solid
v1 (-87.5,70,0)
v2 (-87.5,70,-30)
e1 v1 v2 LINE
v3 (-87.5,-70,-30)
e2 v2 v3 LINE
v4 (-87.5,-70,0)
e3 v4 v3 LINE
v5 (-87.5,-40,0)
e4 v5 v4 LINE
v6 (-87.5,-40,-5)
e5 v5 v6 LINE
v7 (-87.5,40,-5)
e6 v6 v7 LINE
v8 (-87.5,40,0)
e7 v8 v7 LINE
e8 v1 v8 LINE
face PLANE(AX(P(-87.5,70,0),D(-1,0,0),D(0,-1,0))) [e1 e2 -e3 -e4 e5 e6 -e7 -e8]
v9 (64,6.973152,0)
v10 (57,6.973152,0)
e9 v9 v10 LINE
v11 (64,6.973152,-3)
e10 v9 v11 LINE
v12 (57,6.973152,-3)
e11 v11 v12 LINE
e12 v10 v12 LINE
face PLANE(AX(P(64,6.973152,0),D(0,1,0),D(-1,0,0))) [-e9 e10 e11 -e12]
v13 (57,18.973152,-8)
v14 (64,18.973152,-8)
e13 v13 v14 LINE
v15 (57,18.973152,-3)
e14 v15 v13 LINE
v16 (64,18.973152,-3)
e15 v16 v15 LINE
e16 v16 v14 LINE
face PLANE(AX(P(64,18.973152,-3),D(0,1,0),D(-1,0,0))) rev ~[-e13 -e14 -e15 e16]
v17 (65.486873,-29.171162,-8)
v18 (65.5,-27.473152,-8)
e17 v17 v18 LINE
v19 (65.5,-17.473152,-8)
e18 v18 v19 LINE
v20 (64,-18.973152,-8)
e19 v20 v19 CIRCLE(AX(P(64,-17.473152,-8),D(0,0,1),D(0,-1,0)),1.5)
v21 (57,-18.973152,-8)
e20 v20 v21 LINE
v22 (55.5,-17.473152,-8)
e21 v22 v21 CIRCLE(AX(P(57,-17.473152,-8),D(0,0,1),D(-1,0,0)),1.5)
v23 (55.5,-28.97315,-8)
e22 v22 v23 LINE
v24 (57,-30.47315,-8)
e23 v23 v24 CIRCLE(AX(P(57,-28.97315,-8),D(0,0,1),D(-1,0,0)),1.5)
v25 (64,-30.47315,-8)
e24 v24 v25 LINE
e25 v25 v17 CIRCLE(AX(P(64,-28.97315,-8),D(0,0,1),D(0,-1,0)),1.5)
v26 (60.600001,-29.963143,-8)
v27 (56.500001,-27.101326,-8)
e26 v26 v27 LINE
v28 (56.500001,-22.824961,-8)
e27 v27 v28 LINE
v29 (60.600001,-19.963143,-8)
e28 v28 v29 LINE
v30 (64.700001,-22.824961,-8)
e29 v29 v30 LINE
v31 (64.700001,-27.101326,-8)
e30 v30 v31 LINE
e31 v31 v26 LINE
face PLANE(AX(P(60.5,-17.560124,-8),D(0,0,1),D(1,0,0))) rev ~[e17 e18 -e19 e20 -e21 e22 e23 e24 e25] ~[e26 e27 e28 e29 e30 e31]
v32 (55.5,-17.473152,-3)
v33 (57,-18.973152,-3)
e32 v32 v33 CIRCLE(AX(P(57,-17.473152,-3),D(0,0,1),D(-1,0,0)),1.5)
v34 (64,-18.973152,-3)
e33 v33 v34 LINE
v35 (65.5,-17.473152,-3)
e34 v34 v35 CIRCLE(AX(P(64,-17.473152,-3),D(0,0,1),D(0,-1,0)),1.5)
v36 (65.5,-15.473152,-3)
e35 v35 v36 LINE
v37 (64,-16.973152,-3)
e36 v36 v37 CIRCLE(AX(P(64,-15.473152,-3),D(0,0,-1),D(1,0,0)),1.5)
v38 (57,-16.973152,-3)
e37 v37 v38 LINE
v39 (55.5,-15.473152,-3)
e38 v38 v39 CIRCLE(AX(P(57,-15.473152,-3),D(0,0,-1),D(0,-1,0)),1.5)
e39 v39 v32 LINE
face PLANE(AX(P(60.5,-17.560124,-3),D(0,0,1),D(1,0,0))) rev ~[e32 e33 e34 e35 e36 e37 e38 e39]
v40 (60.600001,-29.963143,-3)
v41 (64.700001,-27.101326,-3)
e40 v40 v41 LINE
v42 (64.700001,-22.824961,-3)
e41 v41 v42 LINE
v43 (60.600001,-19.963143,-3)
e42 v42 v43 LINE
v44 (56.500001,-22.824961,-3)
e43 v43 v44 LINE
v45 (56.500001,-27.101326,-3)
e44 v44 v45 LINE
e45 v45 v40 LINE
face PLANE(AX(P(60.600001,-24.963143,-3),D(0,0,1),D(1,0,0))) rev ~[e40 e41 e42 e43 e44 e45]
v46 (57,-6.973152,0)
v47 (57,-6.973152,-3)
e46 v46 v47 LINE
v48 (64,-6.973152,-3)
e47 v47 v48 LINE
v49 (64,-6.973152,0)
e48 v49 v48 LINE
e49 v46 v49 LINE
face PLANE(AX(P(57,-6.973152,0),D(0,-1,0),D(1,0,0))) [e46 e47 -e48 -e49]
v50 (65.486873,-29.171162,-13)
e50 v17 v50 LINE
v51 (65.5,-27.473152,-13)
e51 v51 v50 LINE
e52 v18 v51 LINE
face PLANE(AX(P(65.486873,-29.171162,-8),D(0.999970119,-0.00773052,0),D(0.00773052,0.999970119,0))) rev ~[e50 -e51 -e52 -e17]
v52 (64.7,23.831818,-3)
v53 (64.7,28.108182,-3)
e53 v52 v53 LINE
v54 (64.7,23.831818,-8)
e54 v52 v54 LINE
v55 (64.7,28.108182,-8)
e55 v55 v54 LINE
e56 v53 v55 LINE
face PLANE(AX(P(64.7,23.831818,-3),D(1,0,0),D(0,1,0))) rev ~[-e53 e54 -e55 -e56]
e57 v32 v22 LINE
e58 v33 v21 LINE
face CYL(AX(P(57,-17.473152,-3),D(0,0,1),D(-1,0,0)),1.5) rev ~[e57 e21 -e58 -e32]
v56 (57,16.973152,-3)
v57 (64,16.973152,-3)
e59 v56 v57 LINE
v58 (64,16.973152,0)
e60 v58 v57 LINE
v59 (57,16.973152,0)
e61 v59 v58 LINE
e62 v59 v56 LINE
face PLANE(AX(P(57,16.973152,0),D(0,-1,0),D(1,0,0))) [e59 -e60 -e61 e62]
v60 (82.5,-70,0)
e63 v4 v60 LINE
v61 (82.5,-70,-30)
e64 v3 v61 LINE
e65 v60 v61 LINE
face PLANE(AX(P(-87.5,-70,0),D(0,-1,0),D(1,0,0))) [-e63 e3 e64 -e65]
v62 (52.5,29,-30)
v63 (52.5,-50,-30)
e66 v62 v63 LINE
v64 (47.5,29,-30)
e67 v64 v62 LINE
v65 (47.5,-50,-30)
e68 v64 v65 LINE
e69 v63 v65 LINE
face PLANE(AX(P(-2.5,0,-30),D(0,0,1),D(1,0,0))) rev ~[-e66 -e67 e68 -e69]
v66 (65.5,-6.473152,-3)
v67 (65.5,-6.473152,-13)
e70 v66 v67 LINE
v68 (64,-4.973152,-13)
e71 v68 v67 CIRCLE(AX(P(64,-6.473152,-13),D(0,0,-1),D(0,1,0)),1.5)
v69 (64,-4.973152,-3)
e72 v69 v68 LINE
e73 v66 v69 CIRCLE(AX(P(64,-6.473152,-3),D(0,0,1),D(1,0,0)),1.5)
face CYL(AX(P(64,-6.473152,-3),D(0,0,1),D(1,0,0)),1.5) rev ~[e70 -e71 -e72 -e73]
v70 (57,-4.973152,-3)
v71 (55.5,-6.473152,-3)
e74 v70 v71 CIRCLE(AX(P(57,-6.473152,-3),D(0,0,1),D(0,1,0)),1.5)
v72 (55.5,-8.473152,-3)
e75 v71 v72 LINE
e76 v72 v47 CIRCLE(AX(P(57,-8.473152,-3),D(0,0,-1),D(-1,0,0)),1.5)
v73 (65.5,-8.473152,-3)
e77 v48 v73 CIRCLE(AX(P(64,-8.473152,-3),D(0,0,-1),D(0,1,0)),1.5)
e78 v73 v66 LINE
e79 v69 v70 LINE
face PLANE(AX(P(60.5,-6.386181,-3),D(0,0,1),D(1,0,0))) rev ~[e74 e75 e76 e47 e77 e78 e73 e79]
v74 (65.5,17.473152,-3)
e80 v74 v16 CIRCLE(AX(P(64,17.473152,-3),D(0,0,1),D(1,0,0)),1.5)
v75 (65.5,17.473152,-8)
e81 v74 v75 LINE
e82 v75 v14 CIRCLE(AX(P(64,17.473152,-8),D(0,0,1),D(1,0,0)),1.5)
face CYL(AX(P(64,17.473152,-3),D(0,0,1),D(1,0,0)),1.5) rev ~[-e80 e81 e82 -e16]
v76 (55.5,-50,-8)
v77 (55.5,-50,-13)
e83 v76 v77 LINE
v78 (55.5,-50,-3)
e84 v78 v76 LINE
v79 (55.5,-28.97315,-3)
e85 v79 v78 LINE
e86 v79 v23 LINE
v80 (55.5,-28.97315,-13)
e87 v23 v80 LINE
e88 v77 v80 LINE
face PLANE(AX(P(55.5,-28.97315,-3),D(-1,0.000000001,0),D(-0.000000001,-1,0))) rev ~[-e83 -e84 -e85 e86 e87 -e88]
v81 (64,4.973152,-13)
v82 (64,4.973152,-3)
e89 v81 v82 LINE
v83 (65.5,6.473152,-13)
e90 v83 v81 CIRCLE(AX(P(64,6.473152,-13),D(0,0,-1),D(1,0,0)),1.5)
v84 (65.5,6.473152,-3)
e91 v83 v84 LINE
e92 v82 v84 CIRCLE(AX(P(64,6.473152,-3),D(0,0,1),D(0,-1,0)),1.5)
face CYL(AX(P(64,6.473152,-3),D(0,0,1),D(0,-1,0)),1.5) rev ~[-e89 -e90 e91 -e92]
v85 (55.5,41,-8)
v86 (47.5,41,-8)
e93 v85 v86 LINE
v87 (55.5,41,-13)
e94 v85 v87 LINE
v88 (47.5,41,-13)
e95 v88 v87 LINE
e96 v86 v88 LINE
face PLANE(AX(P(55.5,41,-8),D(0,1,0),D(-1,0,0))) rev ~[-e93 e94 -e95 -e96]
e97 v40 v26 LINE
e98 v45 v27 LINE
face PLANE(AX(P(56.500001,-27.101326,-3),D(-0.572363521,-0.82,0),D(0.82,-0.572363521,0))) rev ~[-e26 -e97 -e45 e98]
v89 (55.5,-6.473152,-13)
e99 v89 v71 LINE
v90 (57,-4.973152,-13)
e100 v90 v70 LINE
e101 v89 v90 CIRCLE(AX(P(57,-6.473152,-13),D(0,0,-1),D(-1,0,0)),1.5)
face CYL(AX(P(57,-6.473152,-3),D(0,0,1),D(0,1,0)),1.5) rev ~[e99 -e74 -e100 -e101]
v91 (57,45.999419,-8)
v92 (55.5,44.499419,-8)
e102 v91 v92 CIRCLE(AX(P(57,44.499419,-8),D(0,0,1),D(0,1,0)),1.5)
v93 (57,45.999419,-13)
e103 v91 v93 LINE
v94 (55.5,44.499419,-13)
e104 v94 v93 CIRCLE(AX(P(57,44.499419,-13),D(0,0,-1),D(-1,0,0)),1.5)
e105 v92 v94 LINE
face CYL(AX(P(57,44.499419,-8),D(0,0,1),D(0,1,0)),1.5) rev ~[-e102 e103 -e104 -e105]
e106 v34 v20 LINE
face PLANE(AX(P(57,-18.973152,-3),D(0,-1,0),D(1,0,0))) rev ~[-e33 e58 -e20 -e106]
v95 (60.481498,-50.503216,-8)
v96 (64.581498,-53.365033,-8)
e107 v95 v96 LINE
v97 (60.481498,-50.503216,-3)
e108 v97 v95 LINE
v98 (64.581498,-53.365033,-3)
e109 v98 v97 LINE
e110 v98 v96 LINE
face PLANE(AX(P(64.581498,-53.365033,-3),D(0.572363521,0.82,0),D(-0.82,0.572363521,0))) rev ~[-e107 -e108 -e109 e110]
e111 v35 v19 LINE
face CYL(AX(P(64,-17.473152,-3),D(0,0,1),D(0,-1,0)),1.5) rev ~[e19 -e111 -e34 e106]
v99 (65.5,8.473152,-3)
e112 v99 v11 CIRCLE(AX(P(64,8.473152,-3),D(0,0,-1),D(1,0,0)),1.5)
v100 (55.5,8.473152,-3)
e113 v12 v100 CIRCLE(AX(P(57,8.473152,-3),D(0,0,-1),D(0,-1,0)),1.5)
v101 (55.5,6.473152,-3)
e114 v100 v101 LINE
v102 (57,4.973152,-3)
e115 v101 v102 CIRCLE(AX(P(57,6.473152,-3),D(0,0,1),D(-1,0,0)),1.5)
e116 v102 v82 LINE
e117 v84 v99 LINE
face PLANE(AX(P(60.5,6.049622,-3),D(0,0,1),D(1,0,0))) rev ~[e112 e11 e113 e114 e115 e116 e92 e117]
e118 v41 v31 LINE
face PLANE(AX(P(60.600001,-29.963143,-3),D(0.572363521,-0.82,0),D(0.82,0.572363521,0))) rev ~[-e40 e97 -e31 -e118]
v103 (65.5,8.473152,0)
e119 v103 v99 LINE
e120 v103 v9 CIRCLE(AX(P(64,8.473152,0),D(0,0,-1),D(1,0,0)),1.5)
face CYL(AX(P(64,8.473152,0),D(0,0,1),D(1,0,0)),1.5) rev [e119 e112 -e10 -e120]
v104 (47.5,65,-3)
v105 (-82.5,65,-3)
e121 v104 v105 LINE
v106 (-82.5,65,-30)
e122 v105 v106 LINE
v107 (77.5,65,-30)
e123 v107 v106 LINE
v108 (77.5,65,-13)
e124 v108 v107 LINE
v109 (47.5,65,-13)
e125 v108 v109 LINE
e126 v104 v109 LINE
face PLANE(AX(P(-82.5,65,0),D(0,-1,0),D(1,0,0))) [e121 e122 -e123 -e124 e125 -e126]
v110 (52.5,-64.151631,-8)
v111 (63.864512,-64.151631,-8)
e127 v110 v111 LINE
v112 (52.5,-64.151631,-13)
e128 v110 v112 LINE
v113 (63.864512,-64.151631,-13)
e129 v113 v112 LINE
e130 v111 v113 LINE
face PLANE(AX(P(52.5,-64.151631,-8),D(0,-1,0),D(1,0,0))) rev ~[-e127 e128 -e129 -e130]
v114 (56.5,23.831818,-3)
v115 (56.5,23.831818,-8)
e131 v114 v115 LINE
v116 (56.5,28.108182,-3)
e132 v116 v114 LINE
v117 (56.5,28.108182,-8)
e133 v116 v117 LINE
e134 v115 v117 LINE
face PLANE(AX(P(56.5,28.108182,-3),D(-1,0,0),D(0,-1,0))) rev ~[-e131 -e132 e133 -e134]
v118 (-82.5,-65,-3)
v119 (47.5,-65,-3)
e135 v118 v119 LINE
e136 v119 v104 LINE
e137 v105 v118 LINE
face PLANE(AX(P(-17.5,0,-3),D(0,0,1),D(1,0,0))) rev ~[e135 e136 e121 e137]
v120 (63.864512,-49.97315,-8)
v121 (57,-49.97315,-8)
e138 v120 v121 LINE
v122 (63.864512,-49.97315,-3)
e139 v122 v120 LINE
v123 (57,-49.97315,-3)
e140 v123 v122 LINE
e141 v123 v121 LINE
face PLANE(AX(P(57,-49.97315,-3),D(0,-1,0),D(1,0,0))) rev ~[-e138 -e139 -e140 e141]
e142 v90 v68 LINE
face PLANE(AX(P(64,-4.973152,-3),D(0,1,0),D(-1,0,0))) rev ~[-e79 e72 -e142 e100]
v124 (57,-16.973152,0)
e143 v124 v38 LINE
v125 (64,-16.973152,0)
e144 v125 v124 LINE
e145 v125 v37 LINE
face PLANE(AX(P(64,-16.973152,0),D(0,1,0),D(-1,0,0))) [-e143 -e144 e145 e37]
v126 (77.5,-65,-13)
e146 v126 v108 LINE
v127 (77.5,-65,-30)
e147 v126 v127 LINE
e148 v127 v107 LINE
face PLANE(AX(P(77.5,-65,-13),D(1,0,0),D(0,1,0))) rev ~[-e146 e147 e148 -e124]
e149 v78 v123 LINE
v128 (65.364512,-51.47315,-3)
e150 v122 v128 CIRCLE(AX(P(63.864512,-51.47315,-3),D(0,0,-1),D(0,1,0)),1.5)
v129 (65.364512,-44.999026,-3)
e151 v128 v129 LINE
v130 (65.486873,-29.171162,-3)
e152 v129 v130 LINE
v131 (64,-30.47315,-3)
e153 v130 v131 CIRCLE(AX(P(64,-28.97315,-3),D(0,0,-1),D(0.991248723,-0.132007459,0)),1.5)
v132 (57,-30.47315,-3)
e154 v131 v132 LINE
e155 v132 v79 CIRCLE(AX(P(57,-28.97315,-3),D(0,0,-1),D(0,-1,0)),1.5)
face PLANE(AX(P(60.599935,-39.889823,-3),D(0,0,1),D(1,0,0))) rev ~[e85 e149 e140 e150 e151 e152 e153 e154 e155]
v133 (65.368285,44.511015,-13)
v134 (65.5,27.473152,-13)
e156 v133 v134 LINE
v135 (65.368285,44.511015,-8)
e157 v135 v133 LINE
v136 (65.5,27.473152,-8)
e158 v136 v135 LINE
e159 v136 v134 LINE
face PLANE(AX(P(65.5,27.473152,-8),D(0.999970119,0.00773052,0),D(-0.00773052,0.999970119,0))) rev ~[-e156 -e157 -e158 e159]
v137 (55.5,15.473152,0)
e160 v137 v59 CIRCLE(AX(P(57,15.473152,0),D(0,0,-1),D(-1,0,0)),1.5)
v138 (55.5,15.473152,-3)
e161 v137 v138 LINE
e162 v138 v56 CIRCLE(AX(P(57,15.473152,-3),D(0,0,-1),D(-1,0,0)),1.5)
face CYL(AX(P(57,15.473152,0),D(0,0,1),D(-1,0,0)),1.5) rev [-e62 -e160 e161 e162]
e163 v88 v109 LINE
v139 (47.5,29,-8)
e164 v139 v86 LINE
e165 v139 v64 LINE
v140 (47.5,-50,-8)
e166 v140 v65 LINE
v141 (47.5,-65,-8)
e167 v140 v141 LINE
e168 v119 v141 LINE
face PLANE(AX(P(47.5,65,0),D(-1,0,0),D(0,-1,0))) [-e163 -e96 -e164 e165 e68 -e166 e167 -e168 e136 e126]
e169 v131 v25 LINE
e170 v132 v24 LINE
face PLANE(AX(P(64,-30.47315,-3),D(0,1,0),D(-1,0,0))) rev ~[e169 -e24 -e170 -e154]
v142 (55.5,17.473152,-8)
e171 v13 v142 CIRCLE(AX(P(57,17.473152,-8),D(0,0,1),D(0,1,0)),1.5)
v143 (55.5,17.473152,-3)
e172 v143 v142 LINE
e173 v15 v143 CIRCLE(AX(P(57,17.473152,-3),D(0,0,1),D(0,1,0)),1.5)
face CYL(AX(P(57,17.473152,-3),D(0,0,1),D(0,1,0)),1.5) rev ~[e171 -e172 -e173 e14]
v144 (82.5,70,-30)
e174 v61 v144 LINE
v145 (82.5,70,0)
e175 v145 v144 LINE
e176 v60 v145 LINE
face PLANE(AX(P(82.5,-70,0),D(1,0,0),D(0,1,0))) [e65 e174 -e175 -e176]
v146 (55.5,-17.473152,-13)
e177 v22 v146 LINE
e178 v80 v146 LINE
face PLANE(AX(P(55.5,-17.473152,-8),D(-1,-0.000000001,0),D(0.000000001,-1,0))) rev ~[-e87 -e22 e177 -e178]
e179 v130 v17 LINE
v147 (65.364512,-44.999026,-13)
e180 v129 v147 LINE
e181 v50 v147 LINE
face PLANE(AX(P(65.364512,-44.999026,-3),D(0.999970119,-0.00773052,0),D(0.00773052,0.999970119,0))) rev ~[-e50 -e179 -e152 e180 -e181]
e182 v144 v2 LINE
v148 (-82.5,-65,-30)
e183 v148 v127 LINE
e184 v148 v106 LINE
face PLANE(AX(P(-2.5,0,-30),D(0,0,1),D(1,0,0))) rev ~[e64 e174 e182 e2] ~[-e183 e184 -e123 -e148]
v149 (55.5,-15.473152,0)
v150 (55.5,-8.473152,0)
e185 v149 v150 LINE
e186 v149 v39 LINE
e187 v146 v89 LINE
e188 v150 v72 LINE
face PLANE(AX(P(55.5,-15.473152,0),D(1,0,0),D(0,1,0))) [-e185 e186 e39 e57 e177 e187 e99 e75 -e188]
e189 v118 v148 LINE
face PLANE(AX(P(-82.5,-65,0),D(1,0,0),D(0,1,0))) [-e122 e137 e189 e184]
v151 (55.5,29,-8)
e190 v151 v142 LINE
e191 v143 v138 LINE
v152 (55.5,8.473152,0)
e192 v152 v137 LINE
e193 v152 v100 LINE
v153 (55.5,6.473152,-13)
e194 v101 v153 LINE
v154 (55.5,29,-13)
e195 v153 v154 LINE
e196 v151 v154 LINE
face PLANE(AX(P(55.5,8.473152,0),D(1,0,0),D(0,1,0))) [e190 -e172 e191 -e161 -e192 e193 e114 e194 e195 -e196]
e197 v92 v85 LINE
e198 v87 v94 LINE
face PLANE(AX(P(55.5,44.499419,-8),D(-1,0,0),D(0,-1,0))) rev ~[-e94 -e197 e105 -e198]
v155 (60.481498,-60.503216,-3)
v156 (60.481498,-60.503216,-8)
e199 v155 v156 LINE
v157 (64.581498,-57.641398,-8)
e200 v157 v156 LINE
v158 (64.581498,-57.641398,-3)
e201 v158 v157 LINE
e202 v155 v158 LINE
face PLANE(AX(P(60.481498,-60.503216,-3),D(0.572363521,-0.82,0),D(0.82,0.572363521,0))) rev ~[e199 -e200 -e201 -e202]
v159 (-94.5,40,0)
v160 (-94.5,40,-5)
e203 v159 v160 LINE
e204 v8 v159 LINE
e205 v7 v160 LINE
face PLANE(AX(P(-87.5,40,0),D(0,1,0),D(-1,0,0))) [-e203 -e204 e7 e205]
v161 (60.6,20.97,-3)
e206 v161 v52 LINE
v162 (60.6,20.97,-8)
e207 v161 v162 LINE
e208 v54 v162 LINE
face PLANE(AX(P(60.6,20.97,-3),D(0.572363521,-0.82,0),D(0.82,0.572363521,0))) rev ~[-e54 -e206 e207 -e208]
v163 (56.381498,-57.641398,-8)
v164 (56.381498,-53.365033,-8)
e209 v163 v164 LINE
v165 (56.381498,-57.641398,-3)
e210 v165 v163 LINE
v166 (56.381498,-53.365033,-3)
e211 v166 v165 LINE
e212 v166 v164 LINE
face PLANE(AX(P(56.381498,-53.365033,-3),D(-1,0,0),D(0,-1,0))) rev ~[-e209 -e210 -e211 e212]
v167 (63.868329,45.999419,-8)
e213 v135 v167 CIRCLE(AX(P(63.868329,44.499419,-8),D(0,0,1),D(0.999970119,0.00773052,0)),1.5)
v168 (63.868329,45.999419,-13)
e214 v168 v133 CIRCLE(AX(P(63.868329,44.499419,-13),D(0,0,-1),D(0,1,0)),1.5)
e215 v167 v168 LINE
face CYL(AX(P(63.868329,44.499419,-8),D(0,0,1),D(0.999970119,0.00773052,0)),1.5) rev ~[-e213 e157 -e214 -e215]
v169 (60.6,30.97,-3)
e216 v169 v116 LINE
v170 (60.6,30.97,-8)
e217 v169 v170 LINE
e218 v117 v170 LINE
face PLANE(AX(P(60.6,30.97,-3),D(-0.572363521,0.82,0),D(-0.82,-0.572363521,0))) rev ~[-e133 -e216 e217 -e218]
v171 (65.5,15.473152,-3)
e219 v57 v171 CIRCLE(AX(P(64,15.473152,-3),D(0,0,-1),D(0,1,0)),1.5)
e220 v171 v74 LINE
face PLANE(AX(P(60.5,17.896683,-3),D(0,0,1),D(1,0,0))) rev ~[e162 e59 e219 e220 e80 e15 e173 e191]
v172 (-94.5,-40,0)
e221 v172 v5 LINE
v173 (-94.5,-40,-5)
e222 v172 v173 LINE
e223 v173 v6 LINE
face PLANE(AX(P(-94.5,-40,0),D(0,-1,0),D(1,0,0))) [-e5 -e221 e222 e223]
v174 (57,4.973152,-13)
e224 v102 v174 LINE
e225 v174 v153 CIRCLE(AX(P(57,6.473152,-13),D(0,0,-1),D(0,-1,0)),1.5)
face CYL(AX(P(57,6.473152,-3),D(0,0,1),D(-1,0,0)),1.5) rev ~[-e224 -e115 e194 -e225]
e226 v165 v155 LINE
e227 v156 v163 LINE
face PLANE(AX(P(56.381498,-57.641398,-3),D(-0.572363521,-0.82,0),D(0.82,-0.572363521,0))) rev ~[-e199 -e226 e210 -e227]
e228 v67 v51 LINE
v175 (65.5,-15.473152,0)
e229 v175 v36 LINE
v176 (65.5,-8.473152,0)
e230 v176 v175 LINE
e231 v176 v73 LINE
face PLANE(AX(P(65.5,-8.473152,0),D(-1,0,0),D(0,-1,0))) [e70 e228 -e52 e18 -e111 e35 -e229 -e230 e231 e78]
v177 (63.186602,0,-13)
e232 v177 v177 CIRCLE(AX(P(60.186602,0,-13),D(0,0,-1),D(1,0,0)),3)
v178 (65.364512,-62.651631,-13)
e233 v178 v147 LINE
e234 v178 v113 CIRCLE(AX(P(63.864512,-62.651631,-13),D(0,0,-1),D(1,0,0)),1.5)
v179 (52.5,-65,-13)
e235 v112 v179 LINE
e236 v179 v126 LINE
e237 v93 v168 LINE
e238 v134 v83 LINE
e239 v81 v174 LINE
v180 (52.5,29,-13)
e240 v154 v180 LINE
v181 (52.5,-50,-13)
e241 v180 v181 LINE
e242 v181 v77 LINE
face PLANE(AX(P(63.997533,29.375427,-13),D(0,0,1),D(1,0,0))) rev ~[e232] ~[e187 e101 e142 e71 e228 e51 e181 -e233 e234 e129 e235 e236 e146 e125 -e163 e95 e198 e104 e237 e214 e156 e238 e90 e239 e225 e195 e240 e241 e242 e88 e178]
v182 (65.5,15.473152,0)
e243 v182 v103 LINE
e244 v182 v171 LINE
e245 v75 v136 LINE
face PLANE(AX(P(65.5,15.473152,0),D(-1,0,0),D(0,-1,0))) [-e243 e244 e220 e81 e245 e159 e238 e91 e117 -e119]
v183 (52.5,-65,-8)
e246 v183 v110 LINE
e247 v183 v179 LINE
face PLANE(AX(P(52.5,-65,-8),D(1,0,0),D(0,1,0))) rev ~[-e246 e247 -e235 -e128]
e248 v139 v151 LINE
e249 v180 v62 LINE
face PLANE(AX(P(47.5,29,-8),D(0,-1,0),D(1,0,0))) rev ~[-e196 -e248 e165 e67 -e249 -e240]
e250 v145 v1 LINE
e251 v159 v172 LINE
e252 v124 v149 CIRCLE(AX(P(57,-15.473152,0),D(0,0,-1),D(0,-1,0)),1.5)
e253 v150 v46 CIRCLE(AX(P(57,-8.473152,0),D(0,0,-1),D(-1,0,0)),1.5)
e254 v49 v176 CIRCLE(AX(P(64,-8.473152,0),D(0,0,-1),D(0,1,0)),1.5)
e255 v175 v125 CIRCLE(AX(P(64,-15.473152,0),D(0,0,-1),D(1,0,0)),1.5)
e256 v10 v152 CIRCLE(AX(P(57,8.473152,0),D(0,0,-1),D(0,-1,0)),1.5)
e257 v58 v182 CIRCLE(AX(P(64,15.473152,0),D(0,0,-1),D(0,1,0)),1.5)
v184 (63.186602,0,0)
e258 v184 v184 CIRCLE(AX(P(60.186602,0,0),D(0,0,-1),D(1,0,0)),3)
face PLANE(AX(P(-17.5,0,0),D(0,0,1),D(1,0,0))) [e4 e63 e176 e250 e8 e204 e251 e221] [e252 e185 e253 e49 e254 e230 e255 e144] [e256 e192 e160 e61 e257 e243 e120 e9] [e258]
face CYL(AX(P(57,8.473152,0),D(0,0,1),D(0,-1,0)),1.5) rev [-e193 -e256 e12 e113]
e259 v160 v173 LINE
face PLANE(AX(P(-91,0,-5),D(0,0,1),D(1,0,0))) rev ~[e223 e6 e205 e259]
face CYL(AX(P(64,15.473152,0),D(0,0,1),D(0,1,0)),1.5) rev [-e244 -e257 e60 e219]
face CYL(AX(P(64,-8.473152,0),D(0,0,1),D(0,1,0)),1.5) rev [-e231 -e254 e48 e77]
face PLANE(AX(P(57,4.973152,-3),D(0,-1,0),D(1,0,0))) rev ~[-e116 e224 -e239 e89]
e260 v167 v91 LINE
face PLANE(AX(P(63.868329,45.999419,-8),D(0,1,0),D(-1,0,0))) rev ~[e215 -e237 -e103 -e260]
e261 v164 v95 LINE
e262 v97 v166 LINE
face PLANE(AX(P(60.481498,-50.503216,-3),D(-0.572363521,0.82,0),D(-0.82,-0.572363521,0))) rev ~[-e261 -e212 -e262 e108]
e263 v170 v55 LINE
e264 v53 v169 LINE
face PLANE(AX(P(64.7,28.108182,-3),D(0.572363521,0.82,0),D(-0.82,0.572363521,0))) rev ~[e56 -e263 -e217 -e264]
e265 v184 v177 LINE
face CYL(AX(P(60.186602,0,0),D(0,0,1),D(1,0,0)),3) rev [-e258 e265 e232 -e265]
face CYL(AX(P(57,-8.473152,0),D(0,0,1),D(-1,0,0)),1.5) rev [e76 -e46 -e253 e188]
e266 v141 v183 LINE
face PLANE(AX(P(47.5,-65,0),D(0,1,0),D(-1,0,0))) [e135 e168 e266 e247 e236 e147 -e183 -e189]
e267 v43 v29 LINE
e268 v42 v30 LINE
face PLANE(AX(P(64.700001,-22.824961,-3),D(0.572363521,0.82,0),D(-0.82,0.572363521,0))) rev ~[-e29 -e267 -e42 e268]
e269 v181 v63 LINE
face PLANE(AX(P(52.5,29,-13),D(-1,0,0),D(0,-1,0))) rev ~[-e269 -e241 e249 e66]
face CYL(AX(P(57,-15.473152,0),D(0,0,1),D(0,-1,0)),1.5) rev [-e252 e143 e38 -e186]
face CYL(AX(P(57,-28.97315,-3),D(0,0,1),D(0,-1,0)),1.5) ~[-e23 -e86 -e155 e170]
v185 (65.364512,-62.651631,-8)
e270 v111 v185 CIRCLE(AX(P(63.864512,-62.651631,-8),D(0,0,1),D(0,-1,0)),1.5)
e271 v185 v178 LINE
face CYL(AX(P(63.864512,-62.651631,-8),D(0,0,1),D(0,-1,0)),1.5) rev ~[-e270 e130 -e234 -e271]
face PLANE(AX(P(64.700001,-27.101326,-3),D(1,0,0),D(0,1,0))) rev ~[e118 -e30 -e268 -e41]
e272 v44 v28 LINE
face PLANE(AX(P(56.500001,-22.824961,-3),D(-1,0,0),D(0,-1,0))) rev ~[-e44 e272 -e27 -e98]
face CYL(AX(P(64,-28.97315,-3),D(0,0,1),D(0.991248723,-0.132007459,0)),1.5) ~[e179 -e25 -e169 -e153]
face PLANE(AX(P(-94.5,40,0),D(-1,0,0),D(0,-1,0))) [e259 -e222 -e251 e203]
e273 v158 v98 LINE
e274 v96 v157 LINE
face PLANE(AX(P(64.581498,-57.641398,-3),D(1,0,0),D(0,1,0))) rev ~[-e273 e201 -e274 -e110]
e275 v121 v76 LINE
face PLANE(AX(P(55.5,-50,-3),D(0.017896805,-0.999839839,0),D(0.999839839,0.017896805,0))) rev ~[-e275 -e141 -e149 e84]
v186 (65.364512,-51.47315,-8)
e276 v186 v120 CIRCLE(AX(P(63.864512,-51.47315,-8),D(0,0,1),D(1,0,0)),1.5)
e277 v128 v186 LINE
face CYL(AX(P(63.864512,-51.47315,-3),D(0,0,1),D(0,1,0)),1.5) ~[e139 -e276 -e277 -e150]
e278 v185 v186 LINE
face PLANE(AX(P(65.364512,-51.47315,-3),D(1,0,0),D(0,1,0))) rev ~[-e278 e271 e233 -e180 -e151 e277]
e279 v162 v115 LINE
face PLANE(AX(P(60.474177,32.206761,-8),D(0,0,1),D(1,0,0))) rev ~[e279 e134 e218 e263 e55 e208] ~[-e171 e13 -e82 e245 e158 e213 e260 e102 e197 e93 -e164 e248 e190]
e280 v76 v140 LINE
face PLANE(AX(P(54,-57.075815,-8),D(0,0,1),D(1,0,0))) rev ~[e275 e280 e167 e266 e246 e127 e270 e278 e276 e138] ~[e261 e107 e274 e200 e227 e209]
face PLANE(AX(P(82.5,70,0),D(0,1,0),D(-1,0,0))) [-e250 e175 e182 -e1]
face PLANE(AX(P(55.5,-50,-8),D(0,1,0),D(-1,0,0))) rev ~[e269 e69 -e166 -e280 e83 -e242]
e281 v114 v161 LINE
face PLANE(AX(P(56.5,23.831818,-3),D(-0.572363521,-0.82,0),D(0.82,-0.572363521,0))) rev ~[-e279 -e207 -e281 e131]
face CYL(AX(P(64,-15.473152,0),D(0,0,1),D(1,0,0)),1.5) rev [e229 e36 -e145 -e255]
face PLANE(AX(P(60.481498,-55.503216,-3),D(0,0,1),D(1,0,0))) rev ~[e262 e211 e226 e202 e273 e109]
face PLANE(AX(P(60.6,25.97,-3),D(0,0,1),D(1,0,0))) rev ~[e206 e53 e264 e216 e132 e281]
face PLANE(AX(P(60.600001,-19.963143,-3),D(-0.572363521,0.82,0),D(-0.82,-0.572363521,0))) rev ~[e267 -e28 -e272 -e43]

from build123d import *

# Parameters (mm, degrees)
F0_W     = 5
F0_H     = 24
F0_H_2   = 12
F0_R     = 2.55
F0_W_2   = 3
F1_DEPTH = 30
F2_START = -13
F2_DEPTH = 17
F3_START = -3
F3_DEPTH = 27
F4_START = -8
F4_DEPTH = 22
F5_DEPTH = 3
F6_DEPTH = 5


# Not quite as in the source:
# - a feature names something its author has since deleted; it is built from what else it names


with BuildPart() as f1:
    # F0 (on Top) → F1 (new body)
    with BuildSketch(Plane.XY):
        Polygon((82.5, 70), (-87.5, 70), (-87.5, 65), (-87.5, 40), (-87.5, 5), (-87.5, -5), (-87.5, -40), (-87.5, -65), (-87.5, -70), (-82.5, -70), (82.5, -70), (82.5, 0), align=None)
        Polygon((47.5, -65), (-82.5, -65), (-82.5, 65), (47.5, 65), (52.5, 65), (77.5, 65), (77.5, 0), (77.5, -65), (52.5, -65), align=None, mode=Mode.SUBTRACT)
        with BuildLine():
            Line((77.5, 65), (52.5, 65))
            Line((52.5, 65), (52.5, 41))
            Line((52.5, 41), (55.5, 41))
            Line((55.5, 41), (55.5, 44.499418828))
            ThreePointArc((55.5, 44.499418828), (55.9393398282, 45.5600789998), (57, 45.999418828))
            Line((57, 45.999418828), (63.8683293534, 45.999418828))
            ThreePointArc((63.8683293534, 45.999418828), (64.9248818439, 45.5641708343), (65.3682845321, 44.5110146078))
            Line((65.3682845321, 44.5110146078), (65.5, 27.4731523439))
            Line((65.5, 27.4731523439), (65.5, 18.9731523439))
            Line((65.5, 18.9731523439), (65.5, 17.4731523439))
            Line((65.5, 17.4731523439), (65.5, 16.9731523439))
            Line((65.5, 16.9731523439), (65.5, 15.4731523439))
            Line((65.5, 15.4731523439), (65.5, 8.4731523439))
            Line((65.5, 8.4731523439), (65.5, 6.9731523439))
            Line((65.5, 6.9731523439), (65.5, 6.4731523439))
            ThreePointArc((65.5, 6.4731523439), (65.0606601718, 5.4124921721), (64, 4.9731523439))
            Line((64, 4.9731523439), (57, 4.9731523439))
            ThreePointArc((57, 4.9731523439), (55.9393398282, 5.4124921721), (55.5, 6.4731523439))
            Line((55.5, 6.4731523439), (55.5, 6.9731523439))
            Line((55.5, 6.9731523439), (55.5, 8.4731523439))
            Line((55.5, 8.4731523439), (55.5, 15.4731523439))
            Line((55.5, 15.4731523439), (55.5, 16.9731523439))
            Line((55.5, 16.9731523439), (55.5, 17.4731523439))
            Line((55.5, 17.4731523439), (55.5, 18.9731523439))
            Line((55.5, 18.9731523439), (55.5, 27.4731523439))
            Line((55.5, 27.4731523439), (55.5, 29))
            Line((55.5, 29), (52.5, 29))
            Line((52.5, 29), (52.5, 0))
            Line((52.5, 0), (57.1866021752, 0))
            ThreePointArc((57.1866021752, 0), (60.1866021752, 3), (63.1866021752, 0))
            Line((63.1866021752, 0), (77.5, 0))
            Line((77.5, 0), (77.5, 65))
        make_face()
        with BuildLine():
            Line((52.5, -64.151630939), (52.5, -65))
            Line((52.5, -65), (77.5, -65))
            Line((77.5, -65), (77.5, 0))
            Line((77.5, 0), (63.1866021752, 0))
            ThreePointArc((63.1866021752, 0), (60.1866021752, -3), (57.1866021752, 0))
            Line((57.1866021752, 0), (52.5, 0))
            Line((52.5, 0), (52.5, -50))
            Line((52.5, -50), (55.5, -50))
            Line((55.5, -50), (55.5, -45))
            Line((55.5, -45), (55.5, -28.9731503129))
            Line((55.5, -28.9731503129), (55.5, -27.4731523439))
            Line((55.5, -27.4731523439), (55.5, -17.4731523439))
            Line((55.5, -17.4731523439), (55.5, -15.4731523439))
            Line((55.5, -15.4731523439), (55.5, -8.4731523439))
            Line((55.5, -8.4731523439), (55.5, -6.4731523439))
            ThreePointArc((55.5, -6.4731523439), (55.9393398282, -5.4124921721), (57, -4.9731523439))
            Line((57, -4.9731523439), (64, -4.9731523439))
            ThreePointArc((64, -4.9731523439), (65.0606601718, -5.4124921721), (65.5, -6.4731523439))
            Line((65.5, -6.4731523439), (65.5, -8.4731523439))
            Line((65.5, -8.4731523439), (65.5, -15.4731523439))
            Line((65.5, -15.4731523439), (65.5, -17.4731523439))
            Line((65.5, -17.4731523439), (65.5, -27.4731523439))
            Line((65.5, -27.4731523439), (65.4868731143, -29.171161501))
            Line((65.4868731143, -29.171161501), (65.3645118363, -44.9990261692))
            Line((65.3645118363, -44.9990261692), (65.3645118363, -51.4731504917))
            Line((65.3645118363, -51.4731504917), (65.3645118363, -58.4731504917))
            Line((65.3645118363, -58.4731504917), (65.3645118363, -62.651630939))
            ThreePointArc((65.3645118363, -62.651630939), (64.9251720081, -63.7122911108), (63.8645118363, -64.151630939))
            Line((63.8645118363, -64.151630939), (55.5, -64.151630939))
            Line((55.5, -64.151630939), (52.5, -64.151630939))
        make_face()
        Polygon((47.5, -0.9090909091), (47.5, -50), (52.5, -50), (52.5, 0), (52.5, 29), (47.5, 29), (47.5, 0.9090909091), align=None)
        with BuildLine():
            Line((55.5, 44.499418828), (55.5, 41))
            Line((55.5, 41), (55.5, 29))
            Line((55.5, 29), (55.5, 27.4731523439))
            Line((55.5, 27.4731523439), (55.5, 18.9731523439))
            Line((55.5, 18.9731523439), (57, 18.9731523439))
            Line((57, 18.9731523439), (64, 18.9731523439))
            Line((64, 18.9731523439), (65.5, 18.9731523439))
            Line((65.5, 18.9731523439), (65.5, 27.4731523439))
            Line((65.5, 27.4731523439), (65.3682845321, 44.5110146078))
            ThreePointArc((65.3682845321, 44.5110146078), (64.9248818439, 45.5641708343), (63.8683293534, 45.999418828))
            Line((63.8683293534, 45.999418828), (57, 45.999418828))
            ThreePointArc((57, 45.999418828), (55.9393398282, 45.5600789998), (55.5, 44.499418828))
        make_face()
        Polygon((60.6, 20.97), (56.5, 23.8318176043), (56.5, 28.1081823957), (60.6, 30.97), (64.7, 28.1081823957), (64.7, 23.8318176043), align=None, mode=Mode.SUBTRACT)
        with BuildLine():
            Line((55.5, -45), (55.5, -50))
            Line((55.5, -50), (57, -49.9731504917))
            Line((57, -49.9731504917), (63.8645118363, -49.9731504917))
            ThreePointArc((63.8645118363, -49.9731504917), (64.9251720081, -50.4124903199), (65.3645118363, -51.4731504917))
            Line((65.3645118363, -51.4731504917), (65.3645118363, -44.9990261692))
            Line((65.3645118363, -44.9990261692), (65.4868731143, -29.171161501))
            ThreePointArc((65.4868731143, -29.171161501), (64.9881759296, -30.1016486032), (64.0000000298, -30.4731503129))
            Line((64.0000000298, -30.4731503129), (57.0000000298, -30.4731503129))
            ThreePointArc((57.0000000298, -30.4731503129), (55.939339858, -30.0338104847), (55.5000000298, -28.9731503129))
            Line((55.5, -28.9731503129), (55.5, -45))
        make_face()
        with BuildLine():
            Line((55.5, -58.4731504917), (55.5, -64.151630939))
            Line((55.5, -64.151630939), (63.8645118363, -64.151630939))
            ThreePointArc((63.8645118363, -64.151630939), (64.9251720081, -63.7122911108), (65.3645118363, -62.651630939))
            Line((65.3645118363, -62.651630939), (65.3645118363, -58.4731504917))
            Line((65.3645118363, -58.4731504917), (65.3645118363, -51.4731504917))
            ThreePointArc((65.3645118363, -51.4731504917), (64.9251720081, -50.4124903199), (63.8645118363, -49.9731504917))
            Line((63.8645118363, -49.9731504917), (57, -49.9731504917))
            Line((57, -49.9731504917), (55.5, -50))
            Line((55.5, -50), (55.5, -51.4731504917))
            Line((55.5, -51.4731504917), (55.5, -58.4731504917))
        make_face()
        Polygon((60.4814975321, -60.5032157659), (56.3814975321, -57.6413981616), (56.3814975321, -53.3650333702), (60.4814975321, -50.5032157659), (64.5814975321, -53.3650333702), (64.5814975321, -57.6413981616), align=None, mode=Mode.SUBTRACT)
        with Locations((50, 53)):
            Rectangle(F0_W, F0_H)
        with BuildLine():
            Line((55.5, -27.4731523439), (55.5, -28.9731503129))
            ThreePointArc((55.5000000298, -28.9731503129), (55.939339858, -30.0338104847), (57.0000000298, -30.4731503129))
            Line((57.0000000298, -30.4731503129), (64.0000000298, -30.4731503129))
            ThreePointArc((64.0000000298, -30.4731503129), (64.9881759296, -30.1016486032), (65.4868731143, -29.171161501))
            Line((65.4868731143, -29.171161501), (65.5, -27.4731523439))
            Line((65.5, -27.4731523439), (65.5, -17.4731523439))
            ThreePointArc((65.5, -17.4731523439), (65.0606601718, -18.5338125156), (64, -18.9731523439))
            Line((64, -18.9731523439), (57, -18.9731523439))
            ThreePointArc((57, -18.9731523439), (55.9393398282, -18.5338125156), (55.5, -17.4731523439))
            Line((55.5, -17.4731523439), (55.5, -27.4731523439))
        make_face()
        Polygon((60.6000007153, -29.9631433734), (56.5000007153, -27.1013257692), (56.5000007153, -22.8249609777), (60.6000007153, -19.9631433734), (64.7000007153, -22.8249609777), (64.7000007153, -27.1013257692), align=None, mode=Mode.SUBTRACT)
        Polygon((47.5, -50), (47.5, -65), (52.5, -65), (52.5, -64.151630939), (52.5, -50), align=None)
        with Locations((50, 35)):
            Rectangle(F0_W, F0_H_2)
        Polygon((56.5, 28.1081823957), (56.5, 23.8318176043), (60.6, 20.97), (64.7, 23.8318176043), (64.7, 28.1081823957), (60.6, 30.97), align=None)
        with Locations((60.6, 25.9731523439)):
            Circle(F0_R, mode=Mode.SUBTRACT)
        Polygon((56.3814975321, -53.3650333702), (56.3814975321, -57.6413981616), (60.4814975321, -60.5032157659), (64.5814975321, -57.6413981616), (64.5814975321, -53.3650333702), (60.4814975321, -50.5032157659), align=None)
        with Locations((60.4823811061, -55.5000021935)):
            Circle(F0_R, mode=Mode.SUBTRACT)
        Polygon((56.5000007153, -22.8249609777), (56.5000007153, -27.1013257692), (60.6000007153, -29.9631433734), (64.7000007153, -27.1013257692), (64.7000007153, -22.8249609777), (60.6000007153, -19.9631433734), align=None)
        with Locations((60.6000007153, -24.9631504917)):
            Circle(F0_R, mode=Mode.SUBTRACT)
        Polygon((52.5, -50), (52.5, -64.151630939), (55.5, -64.151630939), (55.5, -58.4731504917), (55.5, -51.4731504917), (55.5, -50), align=None)
        with Locations((54, 35)):
            Rectangle(F0_W_2, F0_H_2)
        with Locations((60.6000007153, -24.9631504917)):
            Circle(F0_R)
        with Locations((60.4823811061, -55.5000021935)):
            Circle(F0_R)
        with Locations((60.6, 25.9731523439)):
            Circle(F0_R)
        with BuildLine():
            Line((55.5, -6.4731523439), (55.5, -8.4731523439))
            ThreePointArc((55.5, -8.4731523439), (55.9393398282, -7.4124921721), (57, -6.9731523439))
            Line((57, -6.9731523439), (64, -6.9731523439))
            ThreePointArc((64, -6.9731523439), (65.0606601718, -7.4124921721), (65.5, -8.4731523439))
            Line((65.5, -8.4731523439), (65.5, -6.4731523439))
            ThreePointArc((65.5, -6.4731523439), (65.0606601718, -5.4124921721), (64, -4.9731523439))
            Line((64, -4.9731523439), (57, -4.9731523439))
            ThreePointArc((57, -4.9731523439), (55.9393398282, -5.4124921721), (55.5, -6.4731523439))
        make_face()
        with BuildLine():
            Line((55.5, -15.4731523439), (55.5, -17.4731523439))
            ThreePointArc((55.5, -17.4731523439), (55.9393398282, -18.5338125156), (57, -18.9731523439))
            Line((57, -18.9731523439), (64, -18.9731523439))
            ThreePointArc((64, -18.9731523439), (65.0606601718, -18.5338125156), (65.5, -17.4731523439))
            Line((65.5, -17.4731523439), (65.5, -15.4731523439))
            ThreePointArc((65.5, -15.4731523439), (65.0606601718, -16.5338125156), (64, -16.9731523439))
            Line((64, -16.9731523439), (57, -16.9731523439))
            ThreePointArc((57, -16.9731523439), (55.9393398282, -16.5338125156), (55.5, -15.4731523439))
        make_face()
        with BuildLine():
            Line((64, 18.9731523439), (57, 18.9731523439))
            ThreePointArc((57, 18.9731523439), (55.9393398282, 18.5338125156), (55.5, 17.4731523439))
            Line((55.5, 17.4731523439), (55.5, 16.9731523439))
            Line((55.5, 16.9731523439), (57, 16.9731523439))
            Line((57, 16.9731523439), (64, 16.9731523439))
            Line((64, 16.9731523439), (65.5, 16.9731523439))
            Line((65.5, 16.9731523439), (65.5, 17.4731523439))
            ThreePointArc((65.5, 17.4731523439), (65.0606601718, 18.5338125156), (64, 18.9731523439))
        make_face()
        with BuildLine():
            Line((57, 6.9731523439), (55.5, 6.9731523439))
            Line((55.5, 6.9731523439), (55.5, 6.4731523439))
            ThreePointArc((55.5, 6.4731523439), (55.9393398282, 5.4124921721), (57, 4.9731523439))
            Line((57, 4.9731523439), (64, 4.9731523439))
            ThreePointArc((64, 4.9731523439), (65.0606601718, 5.4124921721), (65.5, 6.4731523439))
            Line((65.5, 6.4731523439), (65.5, 6.9731523439))
            Line((65.5, 6.9731523439), (64, 6.9731523439))
            Line((64, 6.9731523439), (57, 6.9731523439))
        make_face()
        with BuildLine():
            Line((65.5, 18.9731523439), (64, 18.9731523439))
            ThreePointArc((64, 18.9731523439), (65.0606601718, 18.5338125156), (65.5, 17.4731523439))
            Line((65.5, 17.4731523439), (65.5, 18.9731523439))
        make_face()
        with BuildLine():
            Line((57, 18.9731523439), (55.5, 18.9731523439))
            Line((55.5, 18.9731523439), (55.5, 17.4731523439))
            ThreePointArc((55.5, 17.4731523439), (55.9393398282, 18.5338125156), (57, 18.9731523439))
        make_face()
        with BuildLine():
            Line((57, 16.9731523439), (55.5, 16.9731523439))
            Line((55.5, 16.9731523439), (55.5, 15.4731523439))
            ThreePointArc((55.5, 15.4731523439), (55.9393398282, 16.5338125156), (57, 16.9731523439))
        make_face()
        with BuildLine():
            Line((65.5, 15.4731523439), (65.5, 16.9731523439))
            Line((65.5, 16.9731523439), (64, 16.9731523439))
            ThreePointArc((64, 16.9731523439), (65.0606601718, 16.5338125156), (65.5, 15.4731523439))
        make_face()
        with BuildLine():
            Line((65.5, 6.9731523439), (65.5, 8.4731523439))
            ThreePointArc((65.5, 8.4731523439), (65.0606601718, 7.4124921721), (64, 6.9731523439))
            Line((64, 6.9731523439), (65.5, 6.9731523439))
        make_face()
        with BuildLine():
            ThreePointArc((57, 6.9731523439), (55.9393398282, 7.4124921721), (55.5, 8.4731523439))
            Line((55.5, 8.4731523439), (55.5, 6.9731523439))
            Line((55.5, 6.9731523439), (57, 6.9731523439))
        make_face()
    extrude(amount=-F1_DEPTH)

    # F0 (on Top) → F2 (cut)
    with BuildSketch(Plane.XY.offset(F2_START)):
        with BuildLine():
            Line((77.5, 65), (52.5, 65))
            Line((52.5, 65), (52.5, 41))
            Line((52.5, 41), (55.5, 41))
            Line((55.5, 41), (55.5, 44.499418828))
            ThreePointArc((55.5, 44.499418828), (55.9393398282, 45.5600789998), (57, 45.999418828))
            Line((57, 45.999418828), (63.8683293534, 45.999418828))
            ThreePointArc((63.8683293534, 45.999418828), (64.9248818439, 45.5641708343), (65.3682845321, 44.5110146078))
            Line((65.3682845321, 44.5110146078), (65.5, 27.4731523439))
            Line((65.5, 27.4731523439), (65.5, 18.9731523439))
            Line((65.5, 18.9731523439), (65.5, 17.4731523439))
            Line((65.5, 17.4731523439), (65.5, 16.9731523439))
            Line((65.5, 16.9731523439), (65.5, 15.4731523439))
            Line((65.5, 15.4731523439), (65.5, 8.4731523439))
            Line((65.5, 8.4731523439), (65.5, 6.9731523439))
            Line((65.5, 6.9731523439), (65.5, 6.4731523439))
            ThreePointArc((65.5, 6.4731523439), (65.0606601718, 5.4124921721), (64, 4.9731523439))
            Line((64, 4.9731523439), (57, 4.9731523439))
            ThreePointArc((57, 4.9731523439), (55.9393398282, 5.4124921721), (55.5, 6.4731523439))
            Line((55.5, 6.4731523439), (55.5, 6.9731523439))
            Line((55.5, 6.9731523439), (55.5, 8.4731523439))
            Line((55.5, 8.4731523439), (55.5, 15.4731523439))
            Line((55.5, 15.4731523439), (55.5, 16.9731523439))
            Line((55.5, 16.9731523439), (55.5, 17.4731523439))
            Line((55.5, 17.4731523439), (55.5, 18.9731523439))
            Line((55.5, 18.9731523439), (55.5, 27.4731523439))
            Line((55.5, 27.4731523439), (55.5, 29))
            Line((55.5, 29), (52.5, 29))
            Line((52.5, 29), (52.5, 0))
            Line((52.5, 0), (57.1866021752, 0))
            ThreePointArc((57.1866021752, 0), (60.1866021752, 3), (63.1866021752, 0))
            Line((63.1866021752, 0), (77.5, 0))
            Line((77.5, 0), (77.5, 65))
        make_face()
        with BuildLine():
            Line((52.5, -64.151630939), (52.5, -65))
            Line((52.5, -65), (77.5, -65))
            Line((77.5, -65), (77.5, 0))
            Line((77.5, 0), (63.1866021752, 0))
            ThreePointArc((63.1866021752, 0), (60.1866021752, -3), (57.1866021752, 0))
            Line((57.1866021752, 0), (52.5, 0))
            Line((52.5, 0), (52.5, -50))
            Line((52.5, -50), (55.5, -50))
            Line((55.5, -50), (55.5, -45))
            Line((55.5, -45), (55.5, -28.9731503129))
            Line((55.5, -28.9731503129), (55.5, -27.4731523439))
            Line((55.5, -27.4731523439), (55.5, -17.4731523439))
            Line((55.5, -17.4731523439), (55.5, -15.4731523439))
            Line((55.5, -15.4731523439), (55.5, -8.4731523439))
            Line((55.5, -8.4731523439), (55.5, -6.4731523439))
            ThreePointArc((55.5, -6.4731523439), (55.9393398282, -5.4124921721), (57, -4.9731523439))
            Line((57, -4.9731523439), (64, -4.9731523439))
            ThreePointArc((64, -4.9731523439), (65.0606601718, -5.4124921721), (65.5, -6.4731523439))
            Line((65.5, -6.4731523439), (65.5, -8.4731523439))
            Line((65.5, -8.4731523439), (65.5, -15.4731523439))
            Line((65.5, -15.4731523439), (65.5, -17.4731523439))
            Line((65.5, -17.4731523439), (65.5, -27.4731523439))
            Line((65.5, -27.4731523439), (65.4868731143, -29.171161501))
            Line((65.4868731143, -29.171161501), (65.3645118363, -44.9990261692))
            Line((65.3645118363, -44.9990261692), (65.3645118363, -51.4731504917))
            Line((65.3645118363, -51.4731504917), (65.3645118363, -58.4731504917))
            Line((65.3645118363, -58.4731504917), (65.3645118363, -62.651630939))
            ThreePointArc((65.3645118363, -62.651630939), (64.9251720081, -63.7122911108), (63.8645118363, -64.151630939))
            Line((63.8645118363, -64.151630939), (55.5, -64.151630939))
            Line((55.5, -64.151630939), (52.5, -64.151630939))
        make_face()
        with Locations((50, 53)):
            Rectangle(F0_W, F0_H)
    extrude(amount=-F2_DEPTH, mode=Mode.SUBTRACT)

    # F0 (on Top) → F3 (cut)
    with BuildSketch(Plane.XY.offset(F3_START)):
        with BuildLine():
            Line((64, 18.9731523439), (57, 18.9731523439))
            ThreePointArc((57, 18.9731523439), (55.9393398282, 18.5338125156), (55.5, 17.4731523439))
            Line((55.5, 17.4731523439), (55.5, 16.9731523439))
            Line((55.5, 16.9731523439), (57, 16.9731523439))
            Line((57, 16.9731523439), (64, 16.9731523439))
            Line((64, 16.9731523439), (65.5, 16.9731523439))
            Line((65.5, 16.9731523439), (65.5, 17.4731523439))
            ThreePointArc((65.5, 17.4731523439), (65.0606601718, 18.5338125156), (64, 18.9731523439))
        make_face()
        with BuildLine():
            Line((57, 6.9731523439), (55.5, 6.9731523439))
            Line((55.5, 6.9731523439), (55.5, 6.4731523439))
            ThreePointArc((55.5, 6.4731523439), (55.9393398282, 5.4124921721), (57, 4.9731523439))
            Line((57, 4.9731523439), (64, 4.9731523439))
            ThreePointArc((64, 4.9731523439), (65.0606601718, 5.4124921721), (65.5, 6.4731523439))
            Line((65.5, 6.4731523439), (65.5, 6.9731523439))
            Line((65.5, 6.9731523439), (64, 6.9731523439))
            Line((64, 6.9731523439), (57, 6.9731523439))
        make_face()
        with BuildLine():
            Line((57, 16.9731523439), (55.5, 16.9731523439))
            Line((55.5, 16.9731523439), (55.5, 15.4731523439))
            ThreePointArc((55.5, 15.4731523439), (55.9393398282, 16.5338125156), (57, 16.9731523439))
        make_face()
        with BuildLine():
            Line((65.5, 15.4731523439), (65.5, 16.9731523439))
            Line((65.5, 16.9731523439), (64, 16.9731523439))
            ThreePointArc((64, 16.9731523439), (65.0606601718, 16.5338125156), (65.5, 15.4731523439))
        make_face()
        with BuildLine():
            Line((65.5, 6.9731523439), (65.5, 8.4731523439))
            ThreePointArc((65.5, 8.4731523439), (65.0606601718, 7.4124921721), (64, 6.9731523439))
            Line((64, 6.9731523439), (65.5, 6.9731523439))
        make_face()
        with BuildLine():
            ThreePointArc((57, 6.9731523439), (55.9393398282, 7.4124921721), (55.5, 8.4731523439))
            Line((55.5, 8.4731523439), (55.5, 6.9731523439))
            Line((55.5, 6.9731523439), (57, 6.9731523439))
        make_face()
        with BuildLine():
            Line((55.5, -6.4731523439), (55.5, -8.4731523439))
            ThreePointArc((55.5, -8.4731523439), (55.9393398282, -7.4124921721), (57, -6.9731523439))
            Line((57, -6.9731523439), (64, -6.9731523439))
            ThreePointArc((64, -6.9731523439), (65.0606601718, -7.4124921721), (65.5, -8.4731523439))
            Line((65.5, -8.4731523439), (65.5, -6.4731523439))
            ThreePointArc((65.5, -6.4731523439), (65.0606601718, -5.4124921721), (64, -4.9731523439))
            Line((64, -4.9731523439), (57, -4.9731523439))
            ThreePointArc((57, -4.9731523439), (55.9393398282, -5.4124921721), (55.5, -6.4731523439))
        make_face()
        with BuildLine():
            Line((55.5, -15.4731523439), (55.5, -17.4731523439))
            ThreePointArc((55.5, -17.4731523439), (55.9393398282, -18.5338125156), (57, -18.9731523439))
            Line((57, -18.9731523439), (64, -18.9731523439))
            ThreePointArc((64, -18.9731523439), (65.0606601718, -18.5338125156), (65.5, -17.4731523439))
            Line((65.5, -17.4731523439), (65.5, -15.4731523439))
            ThreePointArc((65.5, -15.4731523439), (65.0606601718, -16.5338125156), (64, -16.9731523439))
            Line((64, -16.9731523439), (57, -16.9731523439))
            ThreePointArc((57, -16.9731523439), (55.9393398282, -16.5338125156), (55.5, -15.4731523439))
        make_face()
        Polygon((56.3814975321, -53.3650333702), (56.3814975321, -57.6413981616), (60.4814975321, -60.5032157659), (64.5814975321, -57.6413981616), (64.5814975321, -53.3650333702), (60.4814975321, -50.5032157659), align=None)
        with Locations((60.4823811061, -55.5000021935)):
            Circle(F0_R, mode=Mode.SUBTRACT)
        Polygon((56.5000007153, -22.8249609777), (56.5000007153, -27.1013257692), (60.6000007153, -29.9631433734), (64.7000007153, -27.1013257692), (64.7000007153, -22.8249609777), (60.6000007153, -19.9631433734), align=None)
        with Locations((60.6000007153, -24.9631504917)):
            Circle(F0_R, mode=Mode.SUBTRACT)
        with Locations((60.6000007153, -24.9631504917)):
            Circle(F0_R)
        with Locations((60.4823811061, -55.5000021935)):
            Circle(F0_R)
        with BuildLine():
            Line((55.5, -45), (55.5, -50))
            Line((55.5, -50), (57, -49.9731504917))
            Line((57, -49.9731504917), (63.8645118363, -49.9731504917))
            ThreePointArc((63.8645118363, -49.9731504917), (64.9251720081, -50.4124903199), (65.3645118363, -51.4731504917))
            Line((65.3645118363, -51.4731504917), (65.3645118363, -44.9990261692))
            Line((65.3645118363, -44.9990261692), (65.4868731143, -29.171161501))
            ThreePointArc((65.4868731143, -29.171161501), (64.9881759296, -30.1016486032), (64.0000000298, -30.4731503129))
            Line((64.0000000298, -30.4731503129), (57.0000000298, -30.4731503129))
            ThreePointArc((57.0000000298, -30.4731503129), (55.939339858, -30.0338104847), (55.5000000298, -28.9731503129))
            Line((55.5, -28.9731503129), (55.5, -45))
        make_face()
        Polygon((56.5, 28.1081823957), (56.5, 23.8318176043), (60.6, 20.97), (64.7, 23.8318176043), (64.7, 28.1081823957), (60.6, 30.97), align=None)
        with Locations((60.6, 25.9731523439)):
            Circle(F0_R, mode=Mode.SUBTRACT)
        with Locations((60.6, 25.9731523439)):
            Circle(F0_R)
    extrude(amount=-F3_DEPTH, mode=Mode.SUBTRACT)

    # F0 (on Top) → F4 (cut)
    with BuildSketch(Plane.XY.offset(F4_START)):
        with BuildLine():
            Line((55.5, 44.499418828), (55.5, 41))
            Line((55.5, 41), (55.5, 29))
            Line((55.5, 29), (55.5, 27.4731523439))
            Line((55.5, 27.4731523439), (55.5, 18.9731523439))
            Line((55.5, 18.9731523439), (57, 18.9731523439))
            Line((57, 18.9731523439), (64, 18.9731523439))
            Line((64, 18.9731523439), (65.5, 18.9731523439))
            Line((65.5, 18.9731523439), (65.5, 27.4731523439))
            Line((65.5, 27.4731523439), (65.3682845321, 44.5110146078))
            ThreePointArc((65.3682845321, 44.5110146078), (64.9248818439, 45.5641708343), (63.8683293534, 45.999418828))
            Line((63.8683293534, 45.999418828), (57, 45.999418828))
            ThreePointArc((57, 45.999418828), (55.9393398282, 45.5600789998), (55.5, 44.499418828))
        make_face()
        Polygon((60.6, 20.97), (56.5, 23.8318176043), (56.5, 28.1081823957), (60.6, 30.97), (64.7, 28.1081823957), (64.7, 23.8318176043), align=None, mode=Mode.SUBTRACT)
        with BuildLine():
            Line((65.5, 18.9731523439), (64, 18.9731523439))
            ThreePointArc((64, 18.9731523439), (65.0606601718, 18.5338125156), (65.5, 17.4731523439))
            Line((65.5, 17.4731523439), (65.5, 18.9731523439))
        make_face()
        with BuildLine():
            Line((57, 18.9731523439), (55.5, 18.9731523439))
            Line((55.5, 18.9731523439), (55.5, 17.4731523439))
            ThreePointArc((55.5, 17.4731523439), (55.9393398282, 18.5338125156), (57, 18.9731523439))
        make_face()
        with BuildLine():
            Line((64, 18.9731523439), (57, 18.9731523439))
            ThreePointArc((57, 18.9731523439), (55.9393398282, 18.5338125156), (55.5, 17.4731523439))
            Line((55.5, 17.4731523439), (55.5, 16.9731523439))
            Line((55.5, 16.9731523439), (57, 16.9731523439))
            Line((57, 16.9731523439), (64, 16.9731523439))
            Line((64, 16.9731523439), (65.5, 16.9731523439))
            Line((65.5, 16.9731523439), (65.5, 17.4731523439))
            ThreePointArc((65.5, 17.4731523439), (65.0606601718, 18.5338125156), (64, 18.9731523439))
        make_face()
        with BuildLine():
            Line((57, 6.9731523439), (55.5, 6.9731523439))
            Line((55.5, 6.9731523439), (55.5, 6.4731523439))
            ThreePointArc((55.5, 6.4731523439), (55.9393398282, 5.4124921721), (57, 4.9731523439))
            Line((57, 4.9731523439), (64, 4.9731523439))
            ThreePointArc((64, 4.9731523439), (65.0606601718, 5.4124921721), (65.5, 6.4731523439))
            Line((65.5, 6.4731523439), (65.5, 6.9731523439))
            Line((65.5, 6.9731523439), (64, 6.9731523439))
            Line((64, 6.9731523439), (57, 6.9731523439))
        make_face()
        with BuildLine():
            Line((55.5, -6.4731523439), (55.5, -8.4731523439))
            ThreePointArc((55.5, -8.4731523439), (55.9393398282, -7.4124921721), (57, -6.9731523439))
            Line((57, -6.9731523439), (64, -6.9731523439))
            ThreePointArc((64, -6.9731523439), (65.0606601718, -7.4124921721), (65.5, -8.4731523439))
            Line((65.5, -8.4731523439), (65.5, -6.4731523439))
            ThreePointArc((65.5, -6.4731523439), (65.0606601718, -5.4124921721), (64, -4.9731523439))
            Line((64, -4.9731523439), (57, -4.9731523439))
            ThreePointArc((57, -4.9731523439), (55.9393398282, -5.4124921721), (55.5, -6.4731523439))
        make_face()
        with BuildLine():
            Line((55.5, -15.4731523439), (55.5, -17.4731523439))
            ThreePointArc((55.5, -17.4731523439), (55.9393398282, -18.5338125156), (57, -18.9731523439))
            Line((57, -18.9731523439), (64, -18.9731523439))
            ThreePointArc((64, -18.9731523439), (65.0606601718, -18.5338125156), (65.5, -17.4731523439))
            Line((65.5, -17.4731523439), (65.5, -15.4731523439))
            ThreePointArc((65.5, -15.4731523439), (65.0606601718, -16.5338125156), (64, -16.9731523439))
            Line((64, -16.9731523439), (57, -16.9731523439))
            ThreePointArc((57, -16.9731523439), (55.9393398282, -16.5338125156), (55.5, -15.4731523439))
        make_face()
        with BuildLine():
            Line((55.5, -27.4731523439), (55.5, -28.9731503129))
            ThreePointArc((55.5000000298, -28.9731503129), (55.939339858, -30.0338104847), (57.0000000298, -30.4731503129))
            Line((57.0000000298, -30.4731503129), (64.0000000298, -30.4731503129))
            ThreePointArc((64.0000000298, -30.4731503129), (64.9881759296, -30.1016486032), (65.4868731143, -29.171161501))
            Line((65.4868731143, -29.171161501), (65.5, -27.4731523439))
            Line((65.5, -27.4731523439), (65.5, -17.4731523439))
            ThreePointArc((65.5, -17.4731523439), (65.0606601718, -18.5338125156), (64, -18.9731523439))
            Line((64, -18.9731523439), (57, -18.9731523439))
            ThreePointArc((57, -18.9731523439), (55.9393398282, -18.5338125156), (55.5, -17.4731523439))
            Line((55.5, -17.4731523439), (55.5, -27.4731523439))
        make_face()
        Polygon((60.6000007153, -29.9631433734), (56.5000007153, -27.1013257692), (56.5000007153, -22.8249609777), (60.6000007153, -19.9631433734), (64.7000007153, -22.8249609777), (64.7000007153, -27.1013257692), align=None, mode=Mode.SUBTRACT)
        Polygon((52.5, -50), (52.5, -64.151630939), (55.5, -64.151630939), (55.5, -58.4731504917), (55.5, -51.4731504917), (55.5, -50), align=None)
        Polygon((47.5, -50), (47.5, -65), (52.5, -65), (52.5, -64.151630939), (52.5, -50), align=None)
        with Locations((54, 35)):
            Rectangle(F0_W_2, F0_H_2)
        with Locations((50, 35)):
            Rectangle(F0_W, F0_H_2)
        with BuildLine():
            Line((55.5, -58.4731504917), (55.5, -64.151630939))
            Line((55.5, -64.151630939), (63.8645118363, -64.151630939))
            ThreePointArc((63.8645118363, -64.151630939), (64.9251720081, -63.7122911108), (65.3645118363, -62.651630939))
            Line((65.3645118363, -62.651630939), (65.3645118363, -58.4731504917))
            Line((65.3645118363, -58.4731504917), (65.3645118363, -51.4731504917))
            ThreePointArc((65.3645118363, -51.4731504917), (64.9251720081, -50.4124903199), (63.8645118363, -49.9731504917))
            Line((63.8645118363, -49.9731504917), (57, -49.9731504917))
            Line((57, -49.9731504917), (55.5, -50))
            Line((55.5, -50), (55.5, -51.4731504917))
            Line((55.5, -51.4731504917), (55.5, -58.4731504917))
        make_face()
        Polygon((60.4814975321, -60.5032157659), (56.3814975321, -57.6413981616), (56.3814975321, -53.3650333702), (60.4814975321, -50.5032157659), (64.5814975321, -53.3650333702), (64.5814975321, -57.6413981616), align=None, mode=Mode.SUBTRACT)
    extrude(amount=-F4_DEPTH, mode=Mode.SUBTRACT)

    # F0 (on Top) → F5 (join)
    with BuildSketch(Plane.XY):
        Polygon((-82.5, 65), (-82.5, -65), (47.5, -65), (47.5, -50), (47.5, -0.9090909091), (47.5, 0.9090909091), (47.5, 29), (47.5, 41), (47.5, 65), align=None)
    extrude(amount=-F5_DEPTH)

    # F0 (on Top) → F6 (join)
    with BuildSketch(Plane.XY):
        Polygon((-87.5, 5), (-87.5, 40), (-94.5, 40), (-94.5, -40), (-87.5, -40), (-87.5, -5), align=None)
    extrude(amount=-F6_DEPTH)


solid = f1.part
